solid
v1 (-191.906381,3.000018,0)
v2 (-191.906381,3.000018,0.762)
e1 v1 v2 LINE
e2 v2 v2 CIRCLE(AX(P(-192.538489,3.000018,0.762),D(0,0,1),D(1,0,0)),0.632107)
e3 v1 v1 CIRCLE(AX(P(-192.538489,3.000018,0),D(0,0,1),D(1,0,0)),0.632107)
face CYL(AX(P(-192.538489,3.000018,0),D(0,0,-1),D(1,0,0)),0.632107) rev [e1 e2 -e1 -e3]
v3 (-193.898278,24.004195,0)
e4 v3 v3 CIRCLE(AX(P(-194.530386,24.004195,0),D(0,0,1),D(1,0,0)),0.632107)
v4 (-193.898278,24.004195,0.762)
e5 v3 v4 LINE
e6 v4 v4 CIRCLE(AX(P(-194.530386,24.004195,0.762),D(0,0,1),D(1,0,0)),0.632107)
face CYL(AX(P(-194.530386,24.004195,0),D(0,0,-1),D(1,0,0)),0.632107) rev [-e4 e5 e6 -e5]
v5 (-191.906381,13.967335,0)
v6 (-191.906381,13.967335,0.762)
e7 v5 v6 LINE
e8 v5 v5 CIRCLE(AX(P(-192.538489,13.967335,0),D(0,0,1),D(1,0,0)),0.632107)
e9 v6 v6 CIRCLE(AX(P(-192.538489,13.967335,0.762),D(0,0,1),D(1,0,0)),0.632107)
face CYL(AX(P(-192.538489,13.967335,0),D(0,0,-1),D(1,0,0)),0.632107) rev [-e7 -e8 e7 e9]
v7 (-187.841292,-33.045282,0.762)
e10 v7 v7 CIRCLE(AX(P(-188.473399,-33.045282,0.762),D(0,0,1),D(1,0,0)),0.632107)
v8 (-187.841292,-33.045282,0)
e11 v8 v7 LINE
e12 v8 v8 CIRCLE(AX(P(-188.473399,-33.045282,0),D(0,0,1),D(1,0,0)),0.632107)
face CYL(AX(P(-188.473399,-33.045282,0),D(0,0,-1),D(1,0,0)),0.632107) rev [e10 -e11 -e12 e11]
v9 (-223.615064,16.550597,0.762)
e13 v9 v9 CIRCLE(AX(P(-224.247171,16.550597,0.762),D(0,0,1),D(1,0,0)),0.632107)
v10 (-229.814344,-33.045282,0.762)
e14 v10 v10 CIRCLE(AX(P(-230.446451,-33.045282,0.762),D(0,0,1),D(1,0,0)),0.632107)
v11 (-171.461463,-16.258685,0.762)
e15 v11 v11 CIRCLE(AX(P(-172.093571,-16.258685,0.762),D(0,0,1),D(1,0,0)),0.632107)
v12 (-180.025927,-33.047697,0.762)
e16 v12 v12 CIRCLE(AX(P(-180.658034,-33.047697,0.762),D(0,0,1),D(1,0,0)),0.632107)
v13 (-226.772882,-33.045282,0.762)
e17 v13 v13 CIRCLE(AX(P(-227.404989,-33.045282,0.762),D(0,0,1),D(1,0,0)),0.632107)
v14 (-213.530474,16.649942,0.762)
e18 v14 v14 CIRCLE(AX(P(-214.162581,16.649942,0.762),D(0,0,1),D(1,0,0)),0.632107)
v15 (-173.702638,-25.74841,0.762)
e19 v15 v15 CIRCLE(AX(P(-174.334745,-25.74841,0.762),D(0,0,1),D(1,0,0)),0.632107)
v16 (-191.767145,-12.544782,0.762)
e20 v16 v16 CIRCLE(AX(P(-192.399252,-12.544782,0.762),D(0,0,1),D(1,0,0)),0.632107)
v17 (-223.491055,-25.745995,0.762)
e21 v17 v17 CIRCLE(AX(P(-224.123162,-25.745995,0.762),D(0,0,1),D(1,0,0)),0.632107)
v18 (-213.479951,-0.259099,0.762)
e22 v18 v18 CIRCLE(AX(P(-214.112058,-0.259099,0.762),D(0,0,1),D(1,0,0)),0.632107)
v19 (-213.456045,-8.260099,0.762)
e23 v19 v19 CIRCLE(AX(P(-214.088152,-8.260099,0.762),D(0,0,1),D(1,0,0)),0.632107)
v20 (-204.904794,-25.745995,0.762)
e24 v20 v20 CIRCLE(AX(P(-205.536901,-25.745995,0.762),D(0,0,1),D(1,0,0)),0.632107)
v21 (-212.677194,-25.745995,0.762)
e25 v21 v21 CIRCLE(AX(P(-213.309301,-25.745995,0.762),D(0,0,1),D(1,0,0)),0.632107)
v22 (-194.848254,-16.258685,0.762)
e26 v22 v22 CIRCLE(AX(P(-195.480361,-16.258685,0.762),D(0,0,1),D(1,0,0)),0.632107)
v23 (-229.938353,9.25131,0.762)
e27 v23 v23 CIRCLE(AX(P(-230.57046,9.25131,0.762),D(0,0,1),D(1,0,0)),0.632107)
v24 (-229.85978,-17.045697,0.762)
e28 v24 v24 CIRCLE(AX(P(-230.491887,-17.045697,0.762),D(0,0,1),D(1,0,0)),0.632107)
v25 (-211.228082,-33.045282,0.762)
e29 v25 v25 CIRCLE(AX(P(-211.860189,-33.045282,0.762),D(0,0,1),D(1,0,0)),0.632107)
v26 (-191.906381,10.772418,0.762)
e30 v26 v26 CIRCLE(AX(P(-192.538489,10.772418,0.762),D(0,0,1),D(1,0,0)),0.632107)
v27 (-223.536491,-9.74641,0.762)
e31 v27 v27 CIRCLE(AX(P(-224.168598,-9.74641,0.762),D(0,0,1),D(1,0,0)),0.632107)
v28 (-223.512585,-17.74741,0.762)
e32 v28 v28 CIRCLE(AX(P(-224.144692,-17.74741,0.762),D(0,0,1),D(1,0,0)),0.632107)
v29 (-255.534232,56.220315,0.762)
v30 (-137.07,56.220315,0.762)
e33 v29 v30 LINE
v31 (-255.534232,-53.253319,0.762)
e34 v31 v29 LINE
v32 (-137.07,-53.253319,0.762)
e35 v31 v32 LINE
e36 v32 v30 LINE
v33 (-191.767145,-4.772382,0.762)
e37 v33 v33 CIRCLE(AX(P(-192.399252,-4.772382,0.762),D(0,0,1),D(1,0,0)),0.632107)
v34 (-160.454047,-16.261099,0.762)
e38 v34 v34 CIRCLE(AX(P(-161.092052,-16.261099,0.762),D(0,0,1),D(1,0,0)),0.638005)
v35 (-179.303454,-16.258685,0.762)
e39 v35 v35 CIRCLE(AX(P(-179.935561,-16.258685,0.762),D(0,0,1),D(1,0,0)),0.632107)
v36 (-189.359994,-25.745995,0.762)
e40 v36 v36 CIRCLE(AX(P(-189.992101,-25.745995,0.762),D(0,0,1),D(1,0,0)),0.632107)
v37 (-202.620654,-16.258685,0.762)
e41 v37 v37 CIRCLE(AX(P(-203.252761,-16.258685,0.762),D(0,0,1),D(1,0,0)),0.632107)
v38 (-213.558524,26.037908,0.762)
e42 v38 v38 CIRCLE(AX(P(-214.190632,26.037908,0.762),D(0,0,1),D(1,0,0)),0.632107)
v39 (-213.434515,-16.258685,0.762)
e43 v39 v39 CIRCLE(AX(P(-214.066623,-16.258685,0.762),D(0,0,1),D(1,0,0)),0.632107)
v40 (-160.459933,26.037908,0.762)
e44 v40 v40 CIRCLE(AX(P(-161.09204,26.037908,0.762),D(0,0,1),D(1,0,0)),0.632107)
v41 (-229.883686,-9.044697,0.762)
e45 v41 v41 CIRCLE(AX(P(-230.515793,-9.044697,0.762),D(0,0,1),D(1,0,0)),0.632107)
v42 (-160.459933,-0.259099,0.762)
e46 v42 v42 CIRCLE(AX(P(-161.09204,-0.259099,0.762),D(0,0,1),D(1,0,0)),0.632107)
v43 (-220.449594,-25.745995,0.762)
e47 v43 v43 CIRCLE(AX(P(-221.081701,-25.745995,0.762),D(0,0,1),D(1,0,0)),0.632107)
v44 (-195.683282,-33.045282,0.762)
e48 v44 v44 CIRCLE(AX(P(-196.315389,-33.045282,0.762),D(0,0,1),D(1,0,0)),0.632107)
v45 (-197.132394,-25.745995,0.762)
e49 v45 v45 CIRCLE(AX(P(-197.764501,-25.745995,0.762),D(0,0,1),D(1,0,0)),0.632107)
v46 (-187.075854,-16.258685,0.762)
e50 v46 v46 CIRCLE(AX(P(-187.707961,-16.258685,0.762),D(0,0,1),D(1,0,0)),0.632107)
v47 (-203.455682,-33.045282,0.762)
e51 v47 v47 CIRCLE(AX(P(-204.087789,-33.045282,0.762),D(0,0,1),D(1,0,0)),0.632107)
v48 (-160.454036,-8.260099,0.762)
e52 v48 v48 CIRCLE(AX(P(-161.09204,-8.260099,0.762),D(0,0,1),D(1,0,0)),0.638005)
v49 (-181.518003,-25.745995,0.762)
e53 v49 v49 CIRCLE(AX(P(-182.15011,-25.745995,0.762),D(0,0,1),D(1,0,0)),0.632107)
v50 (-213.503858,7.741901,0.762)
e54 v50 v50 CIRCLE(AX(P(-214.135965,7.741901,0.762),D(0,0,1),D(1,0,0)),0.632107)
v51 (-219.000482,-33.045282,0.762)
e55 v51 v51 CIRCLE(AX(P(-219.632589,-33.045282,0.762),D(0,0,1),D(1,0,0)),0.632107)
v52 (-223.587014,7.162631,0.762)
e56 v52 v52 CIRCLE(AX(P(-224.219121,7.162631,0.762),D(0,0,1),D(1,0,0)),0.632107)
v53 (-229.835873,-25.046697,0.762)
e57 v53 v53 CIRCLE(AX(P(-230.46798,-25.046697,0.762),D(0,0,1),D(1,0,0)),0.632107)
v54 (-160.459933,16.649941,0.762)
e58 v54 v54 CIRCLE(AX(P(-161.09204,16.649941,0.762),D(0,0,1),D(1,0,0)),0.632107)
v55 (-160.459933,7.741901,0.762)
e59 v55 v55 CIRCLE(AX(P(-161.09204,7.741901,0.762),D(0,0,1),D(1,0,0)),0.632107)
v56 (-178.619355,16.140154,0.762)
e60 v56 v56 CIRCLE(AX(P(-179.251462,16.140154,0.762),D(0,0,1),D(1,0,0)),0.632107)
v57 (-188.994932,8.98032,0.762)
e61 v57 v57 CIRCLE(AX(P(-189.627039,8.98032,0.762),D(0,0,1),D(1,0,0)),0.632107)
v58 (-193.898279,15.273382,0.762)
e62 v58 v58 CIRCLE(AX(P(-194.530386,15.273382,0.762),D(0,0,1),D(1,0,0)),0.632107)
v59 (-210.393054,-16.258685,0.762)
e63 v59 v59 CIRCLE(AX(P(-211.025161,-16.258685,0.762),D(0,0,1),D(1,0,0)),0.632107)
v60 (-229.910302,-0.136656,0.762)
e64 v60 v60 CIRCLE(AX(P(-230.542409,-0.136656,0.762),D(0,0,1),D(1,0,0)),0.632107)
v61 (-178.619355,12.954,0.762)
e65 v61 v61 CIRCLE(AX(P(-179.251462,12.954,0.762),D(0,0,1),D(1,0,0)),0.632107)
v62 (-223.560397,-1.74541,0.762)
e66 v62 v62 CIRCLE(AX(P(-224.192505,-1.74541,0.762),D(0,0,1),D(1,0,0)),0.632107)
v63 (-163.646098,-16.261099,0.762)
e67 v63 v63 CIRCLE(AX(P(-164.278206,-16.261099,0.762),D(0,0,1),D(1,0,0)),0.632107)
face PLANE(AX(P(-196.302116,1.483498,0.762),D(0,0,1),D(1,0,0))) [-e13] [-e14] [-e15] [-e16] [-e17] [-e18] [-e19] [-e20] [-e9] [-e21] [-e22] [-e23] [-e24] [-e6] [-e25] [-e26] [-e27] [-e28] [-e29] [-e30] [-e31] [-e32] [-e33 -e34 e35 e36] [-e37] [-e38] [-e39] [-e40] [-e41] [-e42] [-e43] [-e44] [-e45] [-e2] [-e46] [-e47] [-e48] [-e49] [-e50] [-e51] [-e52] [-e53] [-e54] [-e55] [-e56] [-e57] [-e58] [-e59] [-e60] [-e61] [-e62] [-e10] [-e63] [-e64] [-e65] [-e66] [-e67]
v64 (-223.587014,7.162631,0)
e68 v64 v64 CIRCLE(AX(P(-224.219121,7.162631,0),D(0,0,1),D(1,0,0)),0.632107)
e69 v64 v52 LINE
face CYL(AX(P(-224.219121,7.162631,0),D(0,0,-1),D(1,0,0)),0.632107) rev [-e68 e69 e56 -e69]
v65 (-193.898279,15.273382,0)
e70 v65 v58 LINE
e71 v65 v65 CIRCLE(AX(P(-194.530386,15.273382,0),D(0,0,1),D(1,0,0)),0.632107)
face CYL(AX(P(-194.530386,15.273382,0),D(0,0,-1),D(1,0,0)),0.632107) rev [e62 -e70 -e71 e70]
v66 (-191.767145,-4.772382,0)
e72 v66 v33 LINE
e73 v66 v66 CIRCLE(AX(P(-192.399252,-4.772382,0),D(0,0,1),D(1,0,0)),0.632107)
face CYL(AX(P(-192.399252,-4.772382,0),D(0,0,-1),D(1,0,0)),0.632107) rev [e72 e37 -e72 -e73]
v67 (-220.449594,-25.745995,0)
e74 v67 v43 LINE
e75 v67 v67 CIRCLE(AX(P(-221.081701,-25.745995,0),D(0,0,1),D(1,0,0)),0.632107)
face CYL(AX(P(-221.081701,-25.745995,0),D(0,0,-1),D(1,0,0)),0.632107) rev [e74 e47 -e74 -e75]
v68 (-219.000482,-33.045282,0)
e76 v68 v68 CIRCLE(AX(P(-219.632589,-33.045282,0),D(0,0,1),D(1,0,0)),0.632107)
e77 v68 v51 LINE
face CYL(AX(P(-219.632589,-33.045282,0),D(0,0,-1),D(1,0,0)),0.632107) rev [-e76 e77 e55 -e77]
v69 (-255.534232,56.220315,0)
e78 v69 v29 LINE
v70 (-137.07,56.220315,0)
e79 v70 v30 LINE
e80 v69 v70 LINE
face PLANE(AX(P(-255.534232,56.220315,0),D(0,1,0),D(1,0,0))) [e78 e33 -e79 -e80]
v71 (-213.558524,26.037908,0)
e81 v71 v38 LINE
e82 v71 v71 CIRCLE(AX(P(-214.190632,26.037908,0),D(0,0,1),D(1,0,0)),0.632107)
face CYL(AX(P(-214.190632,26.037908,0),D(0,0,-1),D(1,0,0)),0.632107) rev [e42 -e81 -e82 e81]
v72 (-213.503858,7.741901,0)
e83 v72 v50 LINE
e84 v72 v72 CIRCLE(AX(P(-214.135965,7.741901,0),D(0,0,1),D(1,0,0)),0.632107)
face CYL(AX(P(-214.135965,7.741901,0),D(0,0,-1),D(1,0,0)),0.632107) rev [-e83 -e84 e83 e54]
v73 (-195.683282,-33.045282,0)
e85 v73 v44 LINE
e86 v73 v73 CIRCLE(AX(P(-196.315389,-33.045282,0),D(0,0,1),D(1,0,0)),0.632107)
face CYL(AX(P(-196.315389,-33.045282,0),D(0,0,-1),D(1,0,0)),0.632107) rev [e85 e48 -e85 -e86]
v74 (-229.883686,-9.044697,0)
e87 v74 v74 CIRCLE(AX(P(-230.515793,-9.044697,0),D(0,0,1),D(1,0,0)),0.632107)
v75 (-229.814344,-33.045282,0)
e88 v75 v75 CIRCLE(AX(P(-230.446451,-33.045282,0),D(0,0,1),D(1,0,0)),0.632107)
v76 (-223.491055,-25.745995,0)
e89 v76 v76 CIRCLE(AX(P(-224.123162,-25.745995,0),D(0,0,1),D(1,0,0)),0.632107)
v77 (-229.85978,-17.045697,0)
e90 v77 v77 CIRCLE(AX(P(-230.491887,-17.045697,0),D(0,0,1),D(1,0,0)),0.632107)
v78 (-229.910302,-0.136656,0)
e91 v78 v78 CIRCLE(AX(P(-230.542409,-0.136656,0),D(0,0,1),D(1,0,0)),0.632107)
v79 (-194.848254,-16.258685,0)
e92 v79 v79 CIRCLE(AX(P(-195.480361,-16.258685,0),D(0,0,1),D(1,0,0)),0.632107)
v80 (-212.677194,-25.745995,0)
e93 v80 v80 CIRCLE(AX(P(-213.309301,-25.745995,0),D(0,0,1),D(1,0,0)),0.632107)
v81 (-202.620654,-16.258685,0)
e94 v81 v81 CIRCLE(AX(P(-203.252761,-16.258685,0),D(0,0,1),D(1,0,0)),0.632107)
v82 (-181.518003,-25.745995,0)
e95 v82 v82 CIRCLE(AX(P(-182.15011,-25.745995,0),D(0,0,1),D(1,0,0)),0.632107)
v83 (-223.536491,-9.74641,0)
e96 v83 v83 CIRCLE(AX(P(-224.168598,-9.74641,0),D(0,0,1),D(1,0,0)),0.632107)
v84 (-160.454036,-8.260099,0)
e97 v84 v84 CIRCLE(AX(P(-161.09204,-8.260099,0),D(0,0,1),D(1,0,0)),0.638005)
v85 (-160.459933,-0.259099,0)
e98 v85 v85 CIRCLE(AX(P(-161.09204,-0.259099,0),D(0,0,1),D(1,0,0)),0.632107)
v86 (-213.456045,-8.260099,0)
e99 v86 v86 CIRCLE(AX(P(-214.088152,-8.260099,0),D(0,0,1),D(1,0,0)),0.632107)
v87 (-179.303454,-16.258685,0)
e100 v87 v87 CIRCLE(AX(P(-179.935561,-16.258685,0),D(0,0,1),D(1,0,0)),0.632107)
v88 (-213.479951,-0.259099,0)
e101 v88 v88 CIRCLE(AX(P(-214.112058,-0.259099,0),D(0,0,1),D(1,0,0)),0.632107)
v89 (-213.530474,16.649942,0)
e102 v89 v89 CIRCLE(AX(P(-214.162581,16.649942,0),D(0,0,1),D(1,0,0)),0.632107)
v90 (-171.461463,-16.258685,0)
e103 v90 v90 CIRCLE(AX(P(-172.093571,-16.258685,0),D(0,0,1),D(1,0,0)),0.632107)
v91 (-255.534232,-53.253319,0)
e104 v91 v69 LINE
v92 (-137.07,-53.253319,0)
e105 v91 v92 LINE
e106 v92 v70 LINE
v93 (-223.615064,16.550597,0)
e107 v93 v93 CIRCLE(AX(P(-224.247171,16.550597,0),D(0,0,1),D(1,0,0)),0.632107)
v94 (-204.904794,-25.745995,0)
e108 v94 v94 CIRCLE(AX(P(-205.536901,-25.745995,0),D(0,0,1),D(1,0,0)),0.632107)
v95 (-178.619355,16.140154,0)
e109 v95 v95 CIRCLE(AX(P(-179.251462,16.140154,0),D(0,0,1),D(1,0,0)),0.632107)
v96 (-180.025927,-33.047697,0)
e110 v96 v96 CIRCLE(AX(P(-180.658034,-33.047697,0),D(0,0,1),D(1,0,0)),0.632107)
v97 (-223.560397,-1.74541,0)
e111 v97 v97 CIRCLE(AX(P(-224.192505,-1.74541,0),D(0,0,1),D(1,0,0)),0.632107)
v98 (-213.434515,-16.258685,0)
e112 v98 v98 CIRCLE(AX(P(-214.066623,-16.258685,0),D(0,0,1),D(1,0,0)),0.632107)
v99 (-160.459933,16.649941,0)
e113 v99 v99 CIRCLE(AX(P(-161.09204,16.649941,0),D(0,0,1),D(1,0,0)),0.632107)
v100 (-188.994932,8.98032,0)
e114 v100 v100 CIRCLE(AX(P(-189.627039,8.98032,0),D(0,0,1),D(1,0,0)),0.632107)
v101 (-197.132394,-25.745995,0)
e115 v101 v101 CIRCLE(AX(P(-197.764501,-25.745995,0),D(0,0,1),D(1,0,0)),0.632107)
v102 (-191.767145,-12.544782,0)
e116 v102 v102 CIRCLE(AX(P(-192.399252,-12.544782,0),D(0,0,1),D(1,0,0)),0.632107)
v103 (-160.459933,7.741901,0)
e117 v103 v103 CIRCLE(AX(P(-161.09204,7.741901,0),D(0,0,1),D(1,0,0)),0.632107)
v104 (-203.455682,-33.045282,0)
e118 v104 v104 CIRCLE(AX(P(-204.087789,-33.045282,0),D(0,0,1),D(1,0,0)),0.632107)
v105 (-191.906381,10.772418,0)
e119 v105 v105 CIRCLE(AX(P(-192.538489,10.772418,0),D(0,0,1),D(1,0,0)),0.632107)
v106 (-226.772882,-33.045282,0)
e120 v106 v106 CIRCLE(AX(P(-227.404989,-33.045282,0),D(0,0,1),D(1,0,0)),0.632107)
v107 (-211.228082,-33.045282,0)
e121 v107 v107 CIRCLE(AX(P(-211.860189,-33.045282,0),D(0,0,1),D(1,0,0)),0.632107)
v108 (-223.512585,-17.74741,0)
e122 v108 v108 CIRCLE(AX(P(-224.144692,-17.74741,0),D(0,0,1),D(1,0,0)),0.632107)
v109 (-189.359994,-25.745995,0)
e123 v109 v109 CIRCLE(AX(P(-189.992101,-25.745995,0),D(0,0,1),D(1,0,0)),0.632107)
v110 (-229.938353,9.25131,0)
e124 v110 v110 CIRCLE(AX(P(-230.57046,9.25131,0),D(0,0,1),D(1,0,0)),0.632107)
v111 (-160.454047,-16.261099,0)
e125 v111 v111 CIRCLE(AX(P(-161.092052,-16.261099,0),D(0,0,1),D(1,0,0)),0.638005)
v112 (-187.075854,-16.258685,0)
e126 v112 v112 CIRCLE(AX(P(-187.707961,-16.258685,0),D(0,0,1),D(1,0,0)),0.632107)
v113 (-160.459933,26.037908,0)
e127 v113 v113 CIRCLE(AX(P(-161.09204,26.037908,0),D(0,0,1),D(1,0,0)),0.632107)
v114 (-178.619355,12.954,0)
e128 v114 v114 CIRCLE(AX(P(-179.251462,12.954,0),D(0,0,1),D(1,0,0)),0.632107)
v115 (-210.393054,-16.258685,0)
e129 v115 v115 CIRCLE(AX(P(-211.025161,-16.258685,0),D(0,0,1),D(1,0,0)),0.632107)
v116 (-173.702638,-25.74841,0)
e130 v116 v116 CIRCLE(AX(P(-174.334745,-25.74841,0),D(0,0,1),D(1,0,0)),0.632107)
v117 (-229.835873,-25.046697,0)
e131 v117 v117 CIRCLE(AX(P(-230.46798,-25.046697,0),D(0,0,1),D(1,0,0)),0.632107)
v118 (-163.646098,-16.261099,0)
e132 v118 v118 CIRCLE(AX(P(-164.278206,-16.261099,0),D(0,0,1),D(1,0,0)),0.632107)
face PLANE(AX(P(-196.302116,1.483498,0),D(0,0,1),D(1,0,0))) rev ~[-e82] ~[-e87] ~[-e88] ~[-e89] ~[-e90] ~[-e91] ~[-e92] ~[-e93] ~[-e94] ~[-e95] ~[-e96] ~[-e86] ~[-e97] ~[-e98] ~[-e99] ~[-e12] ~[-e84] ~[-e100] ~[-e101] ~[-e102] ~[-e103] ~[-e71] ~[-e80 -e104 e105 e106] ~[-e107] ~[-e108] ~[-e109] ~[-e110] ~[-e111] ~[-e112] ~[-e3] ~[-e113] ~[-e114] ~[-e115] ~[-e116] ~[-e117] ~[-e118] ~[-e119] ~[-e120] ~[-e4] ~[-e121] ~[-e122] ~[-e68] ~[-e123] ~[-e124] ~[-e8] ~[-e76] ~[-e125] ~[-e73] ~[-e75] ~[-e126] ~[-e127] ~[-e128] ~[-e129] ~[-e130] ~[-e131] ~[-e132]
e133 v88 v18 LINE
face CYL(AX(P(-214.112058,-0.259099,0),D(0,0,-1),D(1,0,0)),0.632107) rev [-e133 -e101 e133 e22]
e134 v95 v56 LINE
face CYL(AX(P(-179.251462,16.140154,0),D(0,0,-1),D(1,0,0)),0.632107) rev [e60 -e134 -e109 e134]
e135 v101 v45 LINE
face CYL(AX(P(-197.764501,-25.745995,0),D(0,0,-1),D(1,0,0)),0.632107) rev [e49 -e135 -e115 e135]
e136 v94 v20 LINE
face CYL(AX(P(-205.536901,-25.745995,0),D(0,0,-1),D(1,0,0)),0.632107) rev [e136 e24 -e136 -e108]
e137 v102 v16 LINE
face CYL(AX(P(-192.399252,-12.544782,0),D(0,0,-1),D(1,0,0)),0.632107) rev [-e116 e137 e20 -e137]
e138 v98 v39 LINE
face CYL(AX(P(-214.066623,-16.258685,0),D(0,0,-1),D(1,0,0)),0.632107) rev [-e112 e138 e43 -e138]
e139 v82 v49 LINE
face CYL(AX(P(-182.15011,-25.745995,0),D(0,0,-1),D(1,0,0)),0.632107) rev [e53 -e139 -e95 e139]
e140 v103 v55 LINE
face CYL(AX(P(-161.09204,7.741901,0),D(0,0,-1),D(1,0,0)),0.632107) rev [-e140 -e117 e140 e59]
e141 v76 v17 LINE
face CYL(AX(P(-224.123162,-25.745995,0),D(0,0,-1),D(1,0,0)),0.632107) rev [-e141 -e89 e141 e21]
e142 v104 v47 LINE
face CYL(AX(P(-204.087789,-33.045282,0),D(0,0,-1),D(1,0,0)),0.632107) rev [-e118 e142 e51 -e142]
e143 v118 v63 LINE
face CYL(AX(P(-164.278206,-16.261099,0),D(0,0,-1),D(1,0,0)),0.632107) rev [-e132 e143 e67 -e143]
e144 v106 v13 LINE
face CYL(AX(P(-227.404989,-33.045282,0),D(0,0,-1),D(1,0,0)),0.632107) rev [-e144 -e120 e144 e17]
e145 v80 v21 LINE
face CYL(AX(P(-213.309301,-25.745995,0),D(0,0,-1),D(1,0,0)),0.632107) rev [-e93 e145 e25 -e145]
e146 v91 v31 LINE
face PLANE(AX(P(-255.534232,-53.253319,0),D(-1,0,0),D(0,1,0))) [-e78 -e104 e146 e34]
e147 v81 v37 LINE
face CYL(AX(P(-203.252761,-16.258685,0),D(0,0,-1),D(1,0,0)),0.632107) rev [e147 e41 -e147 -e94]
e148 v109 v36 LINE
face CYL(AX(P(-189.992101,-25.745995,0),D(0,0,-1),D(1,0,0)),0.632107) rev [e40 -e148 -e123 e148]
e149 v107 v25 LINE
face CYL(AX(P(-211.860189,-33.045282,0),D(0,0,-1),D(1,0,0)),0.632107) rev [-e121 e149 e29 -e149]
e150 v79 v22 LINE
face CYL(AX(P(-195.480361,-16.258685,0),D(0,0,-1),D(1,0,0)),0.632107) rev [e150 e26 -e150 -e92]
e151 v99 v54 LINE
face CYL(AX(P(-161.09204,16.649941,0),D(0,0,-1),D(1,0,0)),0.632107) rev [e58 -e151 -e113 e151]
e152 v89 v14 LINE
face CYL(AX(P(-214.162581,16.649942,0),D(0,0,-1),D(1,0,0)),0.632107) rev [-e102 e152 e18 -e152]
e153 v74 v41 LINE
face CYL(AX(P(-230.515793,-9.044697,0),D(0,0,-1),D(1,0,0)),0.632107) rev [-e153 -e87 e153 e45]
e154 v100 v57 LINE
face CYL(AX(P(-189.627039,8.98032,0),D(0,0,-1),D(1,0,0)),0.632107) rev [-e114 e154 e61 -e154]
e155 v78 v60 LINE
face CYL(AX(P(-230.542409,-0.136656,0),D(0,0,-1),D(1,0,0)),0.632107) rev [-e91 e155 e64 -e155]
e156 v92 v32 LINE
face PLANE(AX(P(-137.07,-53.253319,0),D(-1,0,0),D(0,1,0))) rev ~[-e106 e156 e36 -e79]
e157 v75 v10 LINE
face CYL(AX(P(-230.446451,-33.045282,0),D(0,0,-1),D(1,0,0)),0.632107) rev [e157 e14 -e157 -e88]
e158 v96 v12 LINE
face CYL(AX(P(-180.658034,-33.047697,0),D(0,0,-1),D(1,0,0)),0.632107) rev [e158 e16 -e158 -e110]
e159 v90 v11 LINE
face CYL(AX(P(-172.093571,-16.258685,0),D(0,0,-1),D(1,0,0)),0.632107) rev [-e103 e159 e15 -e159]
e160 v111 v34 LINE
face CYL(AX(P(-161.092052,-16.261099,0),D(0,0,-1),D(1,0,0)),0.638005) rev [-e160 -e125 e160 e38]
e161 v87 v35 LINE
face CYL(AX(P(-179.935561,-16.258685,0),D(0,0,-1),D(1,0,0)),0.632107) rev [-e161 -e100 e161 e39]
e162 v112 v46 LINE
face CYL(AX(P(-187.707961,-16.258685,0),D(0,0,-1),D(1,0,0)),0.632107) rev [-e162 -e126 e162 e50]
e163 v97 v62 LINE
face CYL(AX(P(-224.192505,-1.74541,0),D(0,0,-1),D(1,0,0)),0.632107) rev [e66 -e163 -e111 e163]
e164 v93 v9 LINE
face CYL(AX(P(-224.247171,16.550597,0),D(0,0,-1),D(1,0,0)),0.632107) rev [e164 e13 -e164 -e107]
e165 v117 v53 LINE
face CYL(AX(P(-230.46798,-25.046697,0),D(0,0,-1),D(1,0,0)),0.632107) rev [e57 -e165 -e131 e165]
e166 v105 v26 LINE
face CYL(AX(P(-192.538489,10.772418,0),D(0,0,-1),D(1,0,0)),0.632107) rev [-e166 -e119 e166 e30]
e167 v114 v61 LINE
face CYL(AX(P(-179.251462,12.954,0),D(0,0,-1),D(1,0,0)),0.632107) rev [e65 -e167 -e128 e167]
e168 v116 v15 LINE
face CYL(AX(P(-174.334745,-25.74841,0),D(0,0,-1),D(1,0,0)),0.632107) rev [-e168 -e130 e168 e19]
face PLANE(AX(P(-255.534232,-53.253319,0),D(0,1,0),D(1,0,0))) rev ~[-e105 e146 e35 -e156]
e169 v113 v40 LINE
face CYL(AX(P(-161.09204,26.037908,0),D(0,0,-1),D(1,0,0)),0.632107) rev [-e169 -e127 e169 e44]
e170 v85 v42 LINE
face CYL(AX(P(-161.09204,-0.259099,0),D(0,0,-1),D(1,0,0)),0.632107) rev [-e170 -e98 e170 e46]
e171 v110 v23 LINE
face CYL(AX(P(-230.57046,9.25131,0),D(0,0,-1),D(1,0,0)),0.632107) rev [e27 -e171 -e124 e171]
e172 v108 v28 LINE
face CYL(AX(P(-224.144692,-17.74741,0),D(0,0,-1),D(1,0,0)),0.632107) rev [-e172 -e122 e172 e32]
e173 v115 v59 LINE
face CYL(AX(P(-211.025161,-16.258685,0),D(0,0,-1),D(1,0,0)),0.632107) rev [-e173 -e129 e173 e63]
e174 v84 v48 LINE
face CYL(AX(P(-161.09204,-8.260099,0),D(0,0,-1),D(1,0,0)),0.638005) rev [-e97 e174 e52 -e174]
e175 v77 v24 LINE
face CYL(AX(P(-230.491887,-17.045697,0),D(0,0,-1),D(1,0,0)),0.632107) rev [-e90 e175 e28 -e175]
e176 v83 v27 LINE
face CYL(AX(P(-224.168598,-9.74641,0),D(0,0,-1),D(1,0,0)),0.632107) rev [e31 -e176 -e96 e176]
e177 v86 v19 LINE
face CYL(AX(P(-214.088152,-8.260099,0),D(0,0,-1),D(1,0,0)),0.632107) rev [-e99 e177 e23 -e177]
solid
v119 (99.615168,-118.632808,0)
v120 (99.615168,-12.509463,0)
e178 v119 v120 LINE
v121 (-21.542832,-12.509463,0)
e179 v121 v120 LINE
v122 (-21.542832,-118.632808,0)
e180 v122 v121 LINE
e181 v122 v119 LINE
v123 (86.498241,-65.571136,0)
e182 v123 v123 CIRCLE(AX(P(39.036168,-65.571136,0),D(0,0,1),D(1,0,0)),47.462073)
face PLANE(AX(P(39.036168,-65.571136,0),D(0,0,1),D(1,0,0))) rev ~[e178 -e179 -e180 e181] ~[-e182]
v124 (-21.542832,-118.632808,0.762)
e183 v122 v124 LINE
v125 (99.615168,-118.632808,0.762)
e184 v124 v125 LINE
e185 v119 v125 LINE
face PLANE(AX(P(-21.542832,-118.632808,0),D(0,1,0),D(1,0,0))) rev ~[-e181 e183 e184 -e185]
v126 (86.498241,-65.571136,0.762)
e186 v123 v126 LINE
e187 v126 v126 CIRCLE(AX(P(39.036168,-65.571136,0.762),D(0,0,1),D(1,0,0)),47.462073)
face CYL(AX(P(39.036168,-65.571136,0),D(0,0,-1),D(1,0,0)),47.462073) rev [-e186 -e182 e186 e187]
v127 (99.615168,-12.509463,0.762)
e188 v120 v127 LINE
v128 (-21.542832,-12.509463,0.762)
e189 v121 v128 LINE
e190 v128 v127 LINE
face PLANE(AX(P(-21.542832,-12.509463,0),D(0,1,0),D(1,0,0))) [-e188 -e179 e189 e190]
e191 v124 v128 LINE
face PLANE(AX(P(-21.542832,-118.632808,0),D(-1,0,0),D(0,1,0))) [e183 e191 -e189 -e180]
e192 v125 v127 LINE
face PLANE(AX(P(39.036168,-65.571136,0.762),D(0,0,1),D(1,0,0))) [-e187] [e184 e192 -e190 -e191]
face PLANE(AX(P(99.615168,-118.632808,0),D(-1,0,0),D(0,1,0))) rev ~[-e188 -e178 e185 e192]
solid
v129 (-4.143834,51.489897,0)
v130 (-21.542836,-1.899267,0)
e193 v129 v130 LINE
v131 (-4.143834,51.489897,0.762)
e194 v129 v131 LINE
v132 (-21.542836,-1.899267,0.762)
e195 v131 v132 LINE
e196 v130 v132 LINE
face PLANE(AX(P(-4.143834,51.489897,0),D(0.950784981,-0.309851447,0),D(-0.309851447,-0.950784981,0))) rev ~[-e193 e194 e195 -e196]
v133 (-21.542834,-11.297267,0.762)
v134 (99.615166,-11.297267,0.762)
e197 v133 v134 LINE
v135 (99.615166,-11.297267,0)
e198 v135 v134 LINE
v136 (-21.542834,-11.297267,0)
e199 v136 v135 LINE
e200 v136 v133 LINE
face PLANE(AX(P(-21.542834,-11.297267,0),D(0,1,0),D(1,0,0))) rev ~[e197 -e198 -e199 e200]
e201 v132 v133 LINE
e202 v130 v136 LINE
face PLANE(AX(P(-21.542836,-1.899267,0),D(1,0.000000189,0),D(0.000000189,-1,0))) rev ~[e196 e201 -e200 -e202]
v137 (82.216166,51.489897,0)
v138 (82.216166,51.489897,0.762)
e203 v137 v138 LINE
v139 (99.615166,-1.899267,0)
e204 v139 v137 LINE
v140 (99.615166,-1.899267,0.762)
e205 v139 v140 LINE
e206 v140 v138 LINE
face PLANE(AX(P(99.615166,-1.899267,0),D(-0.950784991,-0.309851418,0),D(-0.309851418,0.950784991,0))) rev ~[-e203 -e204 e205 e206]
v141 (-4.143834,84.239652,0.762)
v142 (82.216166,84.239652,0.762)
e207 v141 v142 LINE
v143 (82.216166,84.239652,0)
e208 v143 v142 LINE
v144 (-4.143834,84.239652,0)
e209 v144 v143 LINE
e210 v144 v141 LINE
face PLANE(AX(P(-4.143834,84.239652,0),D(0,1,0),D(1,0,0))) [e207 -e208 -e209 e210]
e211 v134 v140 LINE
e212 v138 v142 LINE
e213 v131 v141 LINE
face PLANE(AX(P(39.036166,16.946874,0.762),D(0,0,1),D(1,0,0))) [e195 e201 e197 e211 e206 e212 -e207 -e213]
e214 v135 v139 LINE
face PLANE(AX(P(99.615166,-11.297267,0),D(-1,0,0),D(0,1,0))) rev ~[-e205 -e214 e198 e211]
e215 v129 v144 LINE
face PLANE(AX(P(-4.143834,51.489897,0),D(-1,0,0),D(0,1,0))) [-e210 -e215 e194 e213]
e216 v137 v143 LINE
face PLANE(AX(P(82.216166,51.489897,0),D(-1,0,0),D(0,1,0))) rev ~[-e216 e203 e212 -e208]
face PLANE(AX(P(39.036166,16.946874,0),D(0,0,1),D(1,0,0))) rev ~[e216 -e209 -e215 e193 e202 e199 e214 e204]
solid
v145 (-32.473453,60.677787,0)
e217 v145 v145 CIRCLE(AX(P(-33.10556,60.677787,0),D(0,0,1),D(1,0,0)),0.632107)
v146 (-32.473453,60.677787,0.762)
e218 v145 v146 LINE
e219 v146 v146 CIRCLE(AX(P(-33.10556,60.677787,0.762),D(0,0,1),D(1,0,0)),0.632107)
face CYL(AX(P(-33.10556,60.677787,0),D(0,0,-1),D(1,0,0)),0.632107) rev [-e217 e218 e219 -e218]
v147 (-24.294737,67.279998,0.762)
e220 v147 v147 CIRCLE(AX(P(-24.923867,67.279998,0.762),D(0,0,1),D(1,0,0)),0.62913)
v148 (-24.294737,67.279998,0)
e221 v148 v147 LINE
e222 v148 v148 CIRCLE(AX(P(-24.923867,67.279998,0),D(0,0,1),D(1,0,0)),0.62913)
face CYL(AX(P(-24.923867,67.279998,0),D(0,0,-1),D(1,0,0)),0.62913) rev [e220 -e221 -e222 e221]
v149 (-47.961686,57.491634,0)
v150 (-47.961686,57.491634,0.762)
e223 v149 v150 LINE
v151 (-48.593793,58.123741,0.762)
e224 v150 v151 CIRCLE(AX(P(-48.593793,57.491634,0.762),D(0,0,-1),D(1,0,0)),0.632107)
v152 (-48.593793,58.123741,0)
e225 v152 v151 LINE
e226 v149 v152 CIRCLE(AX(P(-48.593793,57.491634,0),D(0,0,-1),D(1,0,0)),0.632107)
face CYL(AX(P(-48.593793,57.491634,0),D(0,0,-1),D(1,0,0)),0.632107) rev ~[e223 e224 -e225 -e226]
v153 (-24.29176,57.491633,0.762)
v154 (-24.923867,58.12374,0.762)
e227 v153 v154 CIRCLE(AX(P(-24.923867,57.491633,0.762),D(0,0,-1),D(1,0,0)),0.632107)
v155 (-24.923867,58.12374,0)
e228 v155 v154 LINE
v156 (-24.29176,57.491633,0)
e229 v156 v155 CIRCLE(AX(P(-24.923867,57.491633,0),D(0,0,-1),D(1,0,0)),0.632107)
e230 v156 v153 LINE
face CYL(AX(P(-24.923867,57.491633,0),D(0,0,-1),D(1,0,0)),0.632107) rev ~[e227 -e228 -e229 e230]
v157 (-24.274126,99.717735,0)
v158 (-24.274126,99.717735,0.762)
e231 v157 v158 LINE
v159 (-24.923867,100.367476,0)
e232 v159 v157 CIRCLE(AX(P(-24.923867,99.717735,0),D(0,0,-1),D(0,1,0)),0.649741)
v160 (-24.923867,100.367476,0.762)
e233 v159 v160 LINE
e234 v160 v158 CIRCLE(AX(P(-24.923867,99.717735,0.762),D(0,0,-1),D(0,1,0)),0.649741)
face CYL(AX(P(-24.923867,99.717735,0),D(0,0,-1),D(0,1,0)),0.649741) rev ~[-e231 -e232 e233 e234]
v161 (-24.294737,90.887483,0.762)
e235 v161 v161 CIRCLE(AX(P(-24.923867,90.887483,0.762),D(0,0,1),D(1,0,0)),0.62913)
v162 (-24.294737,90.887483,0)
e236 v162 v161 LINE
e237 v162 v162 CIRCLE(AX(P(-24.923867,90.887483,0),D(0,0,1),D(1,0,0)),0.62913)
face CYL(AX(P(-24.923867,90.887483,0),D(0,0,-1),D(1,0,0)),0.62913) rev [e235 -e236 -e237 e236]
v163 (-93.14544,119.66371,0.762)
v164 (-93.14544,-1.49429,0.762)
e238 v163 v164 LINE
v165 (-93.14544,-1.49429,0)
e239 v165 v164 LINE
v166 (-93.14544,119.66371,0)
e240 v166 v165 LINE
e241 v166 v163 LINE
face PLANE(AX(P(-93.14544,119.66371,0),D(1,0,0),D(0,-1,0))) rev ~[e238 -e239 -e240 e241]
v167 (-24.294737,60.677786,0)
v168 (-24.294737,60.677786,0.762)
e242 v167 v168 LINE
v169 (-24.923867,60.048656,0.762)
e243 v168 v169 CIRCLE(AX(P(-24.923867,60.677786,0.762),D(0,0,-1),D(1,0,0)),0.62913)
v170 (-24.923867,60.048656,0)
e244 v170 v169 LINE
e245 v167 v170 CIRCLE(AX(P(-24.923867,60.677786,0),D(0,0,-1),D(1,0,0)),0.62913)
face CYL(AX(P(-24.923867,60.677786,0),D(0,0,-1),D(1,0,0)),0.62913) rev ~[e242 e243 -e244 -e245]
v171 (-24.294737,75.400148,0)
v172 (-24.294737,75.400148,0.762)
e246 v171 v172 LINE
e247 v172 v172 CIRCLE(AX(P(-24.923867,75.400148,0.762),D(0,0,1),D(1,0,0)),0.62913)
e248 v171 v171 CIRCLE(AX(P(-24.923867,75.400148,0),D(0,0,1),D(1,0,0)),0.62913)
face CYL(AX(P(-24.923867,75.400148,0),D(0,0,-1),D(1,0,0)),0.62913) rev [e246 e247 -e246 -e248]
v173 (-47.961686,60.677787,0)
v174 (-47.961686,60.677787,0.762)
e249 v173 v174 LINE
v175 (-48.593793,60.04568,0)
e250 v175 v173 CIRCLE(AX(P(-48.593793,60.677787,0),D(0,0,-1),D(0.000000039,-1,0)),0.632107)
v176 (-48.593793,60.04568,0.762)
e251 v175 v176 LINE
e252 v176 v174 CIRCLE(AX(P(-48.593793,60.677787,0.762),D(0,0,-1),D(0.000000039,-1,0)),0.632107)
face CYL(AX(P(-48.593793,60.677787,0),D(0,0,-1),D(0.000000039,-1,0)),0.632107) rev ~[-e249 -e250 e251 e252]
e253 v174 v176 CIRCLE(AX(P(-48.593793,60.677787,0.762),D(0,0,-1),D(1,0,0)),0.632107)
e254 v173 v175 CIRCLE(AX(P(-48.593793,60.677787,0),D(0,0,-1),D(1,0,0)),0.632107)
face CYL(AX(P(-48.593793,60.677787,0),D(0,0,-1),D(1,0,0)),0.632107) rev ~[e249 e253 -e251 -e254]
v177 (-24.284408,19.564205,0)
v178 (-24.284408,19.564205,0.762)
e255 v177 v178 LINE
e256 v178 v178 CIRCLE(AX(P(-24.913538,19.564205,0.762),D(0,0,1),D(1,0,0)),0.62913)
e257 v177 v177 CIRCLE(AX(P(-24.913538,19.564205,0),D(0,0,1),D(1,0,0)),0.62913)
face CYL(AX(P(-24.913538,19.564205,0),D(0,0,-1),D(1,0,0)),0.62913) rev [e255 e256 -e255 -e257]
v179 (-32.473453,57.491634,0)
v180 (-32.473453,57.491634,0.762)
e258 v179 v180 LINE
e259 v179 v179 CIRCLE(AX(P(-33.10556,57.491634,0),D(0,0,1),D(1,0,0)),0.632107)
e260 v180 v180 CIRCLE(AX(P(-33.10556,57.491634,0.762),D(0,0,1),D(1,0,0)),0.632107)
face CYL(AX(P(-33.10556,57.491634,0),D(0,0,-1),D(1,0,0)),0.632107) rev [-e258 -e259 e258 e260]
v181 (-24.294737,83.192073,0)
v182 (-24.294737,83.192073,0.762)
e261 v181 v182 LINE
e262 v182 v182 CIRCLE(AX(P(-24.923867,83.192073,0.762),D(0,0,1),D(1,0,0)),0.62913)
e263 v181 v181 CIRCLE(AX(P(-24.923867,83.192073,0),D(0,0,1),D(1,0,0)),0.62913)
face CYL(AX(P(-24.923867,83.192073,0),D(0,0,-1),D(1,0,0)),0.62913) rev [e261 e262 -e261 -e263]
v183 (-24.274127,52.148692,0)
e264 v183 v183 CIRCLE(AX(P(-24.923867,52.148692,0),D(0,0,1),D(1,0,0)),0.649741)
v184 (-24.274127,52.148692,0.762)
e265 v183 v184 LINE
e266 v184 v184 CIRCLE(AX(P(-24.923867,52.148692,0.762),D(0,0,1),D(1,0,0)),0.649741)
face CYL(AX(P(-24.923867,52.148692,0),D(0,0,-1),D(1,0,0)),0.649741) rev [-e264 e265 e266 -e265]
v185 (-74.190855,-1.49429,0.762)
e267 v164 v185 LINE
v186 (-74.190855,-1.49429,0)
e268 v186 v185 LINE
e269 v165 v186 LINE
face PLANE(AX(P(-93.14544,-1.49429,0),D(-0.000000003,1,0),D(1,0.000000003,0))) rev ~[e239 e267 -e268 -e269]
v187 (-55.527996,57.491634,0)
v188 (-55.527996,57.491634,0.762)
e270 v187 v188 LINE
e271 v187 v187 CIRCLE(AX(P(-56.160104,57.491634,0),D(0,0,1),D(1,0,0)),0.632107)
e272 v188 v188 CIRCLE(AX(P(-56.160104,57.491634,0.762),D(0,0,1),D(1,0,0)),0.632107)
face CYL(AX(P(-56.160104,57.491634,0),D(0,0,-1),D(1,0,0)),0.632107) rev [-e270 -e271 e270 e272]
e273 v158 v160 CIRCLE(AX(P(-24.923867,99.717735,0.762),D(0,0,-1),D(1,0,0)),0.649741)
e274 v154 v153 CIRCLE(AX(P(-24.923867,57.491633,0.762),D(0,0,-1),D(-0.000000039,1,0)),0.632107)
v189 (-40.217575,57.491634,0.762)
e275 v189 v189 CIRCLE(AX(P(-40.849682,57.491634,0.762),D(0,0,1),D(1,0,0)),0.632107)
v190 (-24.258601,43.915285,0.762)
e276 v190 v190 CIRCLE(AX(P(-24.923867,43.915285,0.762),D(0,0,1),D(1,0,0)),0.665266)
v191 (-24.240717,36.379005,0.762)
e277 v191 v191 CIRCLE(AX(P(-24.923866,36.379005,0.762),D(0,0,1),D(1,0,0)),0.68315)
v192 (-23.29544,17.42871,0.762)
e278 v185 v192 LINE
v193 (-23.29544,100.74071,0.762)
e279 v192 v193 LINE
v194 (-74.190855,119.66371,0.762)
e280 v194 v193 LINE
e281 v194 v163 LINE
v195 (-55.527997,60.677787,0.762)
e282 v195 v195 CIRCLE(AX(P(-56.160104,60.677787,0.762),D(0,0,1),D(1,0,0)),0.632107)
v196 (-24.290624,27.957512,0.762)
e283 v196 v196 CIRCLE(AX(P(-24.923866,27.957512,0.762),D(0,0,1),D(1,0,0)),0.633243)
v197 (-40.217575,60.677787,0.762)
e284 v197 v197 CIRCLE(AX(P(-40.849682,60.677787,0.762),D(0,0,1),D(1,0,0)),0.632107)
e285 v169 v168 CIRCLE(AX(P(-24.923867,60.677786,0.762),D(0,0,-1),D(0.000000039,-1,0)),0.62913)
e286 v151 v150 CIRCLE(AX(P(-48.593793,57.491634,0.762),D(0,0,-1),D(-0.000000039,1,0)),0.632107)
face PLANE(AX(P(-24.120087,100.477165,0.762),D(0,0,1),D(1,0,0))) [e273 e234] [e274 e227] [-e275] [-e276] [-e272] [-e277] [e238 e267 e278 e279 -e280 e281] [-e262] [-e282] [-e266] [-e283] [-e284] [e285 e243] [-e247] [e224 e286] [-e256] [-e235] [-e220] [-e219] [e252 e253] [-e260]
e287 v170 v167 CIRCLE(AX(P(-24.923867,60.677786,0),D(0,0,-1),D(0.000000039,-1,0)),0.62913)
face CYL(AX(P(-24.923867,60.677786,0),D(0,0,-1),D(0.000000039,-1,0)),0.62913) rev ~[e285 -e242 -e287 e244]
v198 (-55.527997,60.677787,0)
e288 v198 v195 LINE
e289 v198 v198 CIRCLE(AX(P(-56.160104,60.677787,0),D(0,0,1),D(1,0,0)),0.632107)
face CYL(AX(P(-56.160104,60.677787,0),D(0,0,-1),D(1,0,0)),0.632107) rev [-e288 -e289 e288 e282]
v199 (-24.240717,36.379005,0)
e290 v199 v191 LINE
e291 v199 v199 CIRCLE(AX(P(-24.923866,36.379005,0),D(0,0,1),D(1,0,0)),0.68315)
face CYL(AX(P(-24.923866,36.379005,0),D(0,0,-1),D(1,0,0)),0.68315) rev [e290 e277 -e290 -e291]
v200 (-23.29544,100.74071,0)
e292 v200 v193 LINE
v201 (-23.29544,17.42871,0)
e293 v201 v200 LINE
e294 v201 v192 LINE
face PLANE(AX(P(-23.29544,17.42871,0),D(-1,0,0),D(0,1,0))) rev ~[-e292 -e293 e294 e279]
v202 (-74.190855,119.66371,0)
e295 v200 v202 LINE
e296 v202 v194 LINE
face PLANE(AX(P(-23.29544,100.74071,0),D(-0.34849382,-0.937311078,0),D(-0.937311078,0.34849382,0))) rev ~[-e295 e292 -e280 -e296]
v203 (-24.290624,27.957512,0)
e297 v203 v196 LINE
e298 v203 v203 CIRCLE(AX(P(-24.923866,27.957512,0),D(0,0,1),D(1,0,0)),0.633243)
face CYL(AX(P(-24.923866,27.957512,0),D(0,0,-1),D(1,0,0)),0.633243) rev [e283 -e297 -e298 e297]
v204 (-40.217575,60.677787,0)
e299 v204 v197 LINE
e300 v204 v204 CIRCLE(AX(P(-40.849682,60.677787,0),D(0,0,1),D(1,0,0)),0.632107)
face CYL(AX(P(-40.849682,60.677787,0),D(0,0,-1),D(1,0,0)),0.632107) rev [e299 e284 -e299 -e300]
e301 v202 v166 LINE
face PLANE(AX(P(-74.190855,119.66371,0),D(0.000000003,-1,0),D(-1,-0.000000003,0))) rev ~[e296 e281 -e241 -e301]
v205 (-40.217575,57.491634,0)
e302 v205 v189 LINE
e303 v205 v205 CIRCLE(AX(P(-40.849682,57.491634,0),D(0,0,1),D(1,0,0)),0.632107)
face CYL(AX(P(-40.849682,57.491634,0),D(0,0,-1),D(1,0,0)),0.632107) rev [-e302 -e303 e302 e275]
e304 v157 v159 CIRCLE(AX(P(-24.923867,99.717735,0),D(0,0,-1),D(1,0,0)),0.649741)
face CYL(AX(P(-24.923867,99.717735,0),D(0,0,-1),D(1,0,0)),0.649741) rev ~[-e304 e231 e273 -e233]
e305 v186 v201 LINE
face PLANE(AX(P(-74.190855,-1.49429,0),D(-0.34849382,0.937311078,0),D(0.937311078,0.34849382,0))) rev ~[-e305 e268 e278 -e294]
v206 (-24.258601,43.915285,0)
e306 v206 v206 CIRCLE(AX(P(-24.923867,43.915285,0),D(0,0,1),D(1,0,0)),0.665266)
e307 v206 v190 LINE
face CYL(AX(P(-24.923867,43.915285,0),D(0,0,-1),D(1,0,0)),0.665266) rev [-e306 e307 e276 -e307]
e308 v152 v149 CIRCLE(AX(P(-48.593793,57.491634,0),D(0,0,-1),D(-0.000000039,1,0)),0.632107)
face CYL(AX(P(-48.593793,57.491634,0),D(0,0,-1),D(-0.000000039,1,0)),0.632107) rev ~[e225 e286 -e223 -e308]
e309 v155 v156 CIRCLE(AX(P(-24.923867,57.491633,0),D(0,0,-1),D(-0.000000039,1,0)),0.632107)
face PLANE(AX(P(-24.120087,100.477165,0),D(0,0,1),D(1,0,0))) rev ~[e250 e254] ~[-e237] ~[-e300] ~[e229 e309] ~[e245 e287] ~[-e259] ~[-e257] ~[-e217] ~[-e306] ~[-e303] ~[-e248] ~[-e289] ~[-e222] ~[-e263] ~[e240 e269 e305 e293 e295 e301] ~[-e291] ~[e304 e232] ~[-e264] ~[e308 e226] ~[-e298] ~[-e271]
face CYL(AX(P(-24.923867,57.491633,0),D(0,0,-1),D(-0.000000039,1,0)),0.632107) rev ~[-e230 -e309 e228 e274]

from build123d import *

# Parameters (mm, degrees)
F0_R     = 0.6291300435
F0_R_2   = 0.6332426452
F0_R_3   = 0.6321071221
F0_R_4   = 0.6831497721
F0_R_5   = 0.6652658208
F0_R_6   = 0.6497405611
F1_DEPTH = 0.762
F0_W     = 121.1580000409
F0_H     = 106.1233448563
F0_R_7   = 47.4620730635
F0_W_2   = 86.36
F0_H_2   = 32.7497554244
F0_W_3   = 118.4642314911
F0_H_3   = 109.4736345112
F0_R_8   = 0.6380048555


# Not quite as in the source:
# - ends of sketch curves that miss each other by under 0.0002 mm in the source are joined


with BuildPart() as f1:
    # F0 (on Top) → F1 (new body)
    with BuildSketch(Plane.XY):
        with BuildLine():
            Line((-23.2954401877, 99.7177349776), (-23.2954401877, 100.7407097936))
            Line((-23.2954401877, 100.7407097936), (-24.9238666147, 101.3461614512))
            Line((-24.9238666147, 101.3461614512), (-24.9238666147, 100.3674755386))
            ThreePointArc((-24.9238666147, 100.3674755386), (-24.464430658, 100.1771709343), (-24.2741260536, 99.7177349776))
            Line((-24.2741260536, 99.7177349776), (-23.295440141, 99.7177349776))
        make_face()
        with BuildLine():
            Line((-23.2954401877, 17.4287097936), (-23.2954401877, 99.7177349776))
            Line((-23.295440141, 99.7177349776), (-24.2741260536, 99.7177349776))
            ThreePointArc((-24.2741260536, 99.7177349776), (-25.3833025714, 99.2582990208), (-24.9238666147, 100.3674755386))
            Line((-24.9238666147, 100.3674755386), (-24.9238666147, 101.3461614512))
            Line((-24.9238666147, 101.3461614512), (-61.3954401877, 114.9063532467))
            Line((-61.3954401877, 114.9063532467), (-61.3954401877, 3.2630663405))
            Line((-61.3954401877, 3.2630663405), (-23.2954401877, 17.4287097936))
        make_face()
        with Locations((-24.9135376631, 19.5642051806)):
            Circle(F0_R, mode=Mode.SUBTRACT)
        with Locations((-24.9238663907, 27.9575124074)):
            Circle(F0_R_2, mode=Mode.SUBTRACT)
        with Locations((-56.1601035297, 57.4916340411)):
            Circle(F0_R_3, mode=Mode.SUBTRACT)
        with BuildLine():
            ThreePointArc((-48.5937930891, 58.1237411632), (-48.1468258406, 57.9386012823), (-47.9616859422, 57.4916340411))
            ThreePointArc((-47.9616859422, 57.4916340411), (-49.0407602881, 57.0446667999), (-48.5937930891, 58.1237411632))
        make_face(mode=Mode.SUBTRACT)
        with Locations((-40.8496819437, 57.4916340411)):
            Circle(F0_R_3, mode=Mode.SUBTRACT)
        with Locations((-24.9238663907, 36.3790051806)):
            Circle(F0_R_4, mode=Mode.SUBTRACT)
        with Locations((-24.9238672481, 43.9152853082)):
            Circle(F0_R_5, mode=Mode.SUBTRACT)
        with Locations((-24.9238672481, 52.148692377)):
            Circle(F0_R_6, mode=Mode.SUBTRACT)
        with Locations((-33.105560055, 57.4916340411)):
            Circle(F0_R_3, mode=Mode.SUBTRACT)
        with BuildLine():
            ThreePointArc((-24.2917600637, 57.49163313), (-25.3708344096, 57.0446658888), (-24.9238672105, 58.1237402522))
            ThreePointArc((-24.9238672105, 58.1237402522), (-24.4768999621, 57.9386003713), (-24.2917600637, 57.49163313))
        make_face(mode=Mode.SUBTRACT)
        with Locations((-56.1601036542, 60.6777873683)):
            Circle(F0_R_3, mode=Mode.SUBTRACT)
        with BuildLine():
            ThreePointArc((-47.9616860667, 60.6777873683), (-48.1468259476, 60.2308201445), (-48.5937931642, 60.0456802461))
            ThreePointArc((-48.5937931642, 60.0456802461), (-49.0407604301, 61.124754592), (-47.9616860667, 60.6777873683))
        make_face(mode=Mode.SUBTRACT)
        with Locations((-40.8496820682, 60.6777873683)):
            Circle(F0_R_3, mode=Mode.SUBTRACT)
        with Locations((-33.1055601795, 60.6777873683)):
            Circle(F0_R_3, mode=Mode.SUBTRACT)
        with BuildLine():
            ThreePointArc((-24.9238672857, 60.0486564137), (-25.368729439, 61.1226485686), (-24.2947372668, 60.6777864572))
            ThreePointArc((-24.2947372668, 60.6777864572), (-24.4790051816, 60.2329243459), (-24.9238672857, 60.0486564137))
        make_face(mode=Mode.SUBTRACT)
        with Locations((-24.9238672481, 67.2799982802)):
            Circle(F0_R, mode=Mode.SUBTRACT)
        with Locations((-24.9238672481, 75.4001476542)):
            Circle(F0_R, mode=Mode.SUBTRACT)
        with Locations((-24.9238672481, 83.1920728759)):
            Circle(F0_R, mode=Mode.SUBTRACT)
        with Locations((-24.9238672481, 90.8874832765)):
            Circle(F0_R, mode=Mode.SUBTRACT)
        Polygon((-61.3954401877, 3.2630663405), (-61.3954401877, 114.9063532467), (-74.1908550262, 119.6637097936), (-93.1454401877, 119.6637097337), (-93.1454401877, -1.4942902663), (-74.1908550262, -1.4942902064), align=None)
    extrude(amount=F1_DEPTH)


with BuildPart() as f1b:
    # F0 (on Top) → F1, piece 2 (new body)
    with BuildSketch(Plane.XY):
        with Locations((39.0361677242, -65.5711358995)):
            Rectangle(F0_W, F0_H)
        with Locations((39.0361677242, -65.5711358995)):
            Circle(F0_R_7, mode=Mode.SUBTRACT)
    extrude(amount=F1_DEPTH)


with BuildPart() as f1c:
    # F0 (on Top) → F1, piece 3 (new body)
    with BuildSketch(Plane.XY):
        Polygon((-21.5428358989, -1.8992669303), (-21.542834118, -11.2972669303), (99.615165882, -11.2972669303), (99.615165882, -1.8992669303), (82.216165882, 51.4898966411), (-4.143834118, 51.4898966411), align=None)
        with Locations((39.036165882, 67.8647743533)):
            Rectangle(F0_W_2, F0_H_2)
    extrude(amount=F1_DEPTH)


with BuildPart() as f1d:
    # F0 (on Top) → F1, piece 4 (new body)
    with BuildSketch(Plane.XY):
        with Locations((-196.3021159172, 1.4834981412)):
            Rectangle(F0_W_3, F0_H_3)
        with Locations((-230.4464508814, -33.0452823357)):
            Circle(F0_R_3, mode=Mode.SUBTRACT)
        with Locations((-227.4049893772, -33.0452823357)):
            Circle(F0_R_3, mode=Mode.SUBTRACT)
        with Locations((-219.6325893772, -33.0452823357)):
            Circle(F0_R_3, mode=Mode.SUBTRACT)
        with Locations((-211.8601893772, -33.0452823357)):
            Circle(F0_R_3, mode=Mode.SUBTRACT)
        with Locations((-204.0877893772, -33.0452823357)):
            Circle(F0_R_3, mode=Mode.SUBTRACT)
        with Locations((-196.3153893772, -33.0452823357)):
            Circle(F0_R_3, mode=Mode.SUBTRACT)
        with Locations((-188.4733988456, -33.0452823357)):
            Circle(F0_R_3, mode=Mode.SUBTRACT)
        with Locations((-180.6580338506, -33.0476967251)):
            Circle(F0_R_3, mode=Mode.SUBTRACT)
        with Locations((-224.1231624798, -25.7459953427)):
            Circle(F0_R_3, mode=Mode.SUBTRACT)
        with Locations((-230.4679803544, -25.0466966536)):
            Circle(F0_R_3, mode=Mode.SUBTRACT)
        with Locations((-221.0817009756, -25.7459953427)):
            Circle(F0_R_3, mode=Mode.SUBTRACT)
        with Locations((-213.3093009756, -25.7459953427)):
            Circle(F0_R_3, mode=Mode.SUBTRACT)
        with Locations((-230.4918866598, -17.0456967317)):
            Circle(F0_R_3, mode=Mode.SUBTRACT)
        with Locations((-224.1446919528, -17.7474096606)):
            Circle(F0_R_3, mode=Mode.SUBTRACT)
        with Locations((-214.0666225876, -16.2586848782)):
            Circle(F0_R_3, mode=Mode.SUBTRACT)
        with Locations((-230.5157929659, -9.0446965769)):
            Circle(F0_R_3, mode=Mode.SUBTRACT)
        with Locations((-224.1685982582, -9.7464097387)):
            Circle(F0_R_3, mode=Mode.SUBTRACT)
        with Locations((-214.0881520606, -8.2600991961)):
            Circle(F0_R_3, mode=Mode.SUBTRACT)
        with Locations((-230.5424094321, -0.1366557553)):
            Circle(F0_R_3, mode=Mode.SUBTRACT)
        with Locations((-224.1925045643, -1.7454095839)):
            Circle(F0_R_3, mode=Mode.SUBTRACT)
        with Locations((-214.112058366, -0.2590992742)):
            Circle(F0_R_3, mode=Mode.SUBTRACT)
        with Locations((-205.5369009756, -25.7459953427)):
            Circle(F0_R_3, mode=Mode.SUBTRACT)
        with Locations((-197.7645009756, -25.7459953427)):
            Circle(F0_R_3, mode=Mode.SUBTRACT)
        with Locations((-189.9921009756, -25.7459953427)):
            Circle(F0_R_3, mode=Mode.SUBTRACT)
        with Locations((-211.0251610834, -16.2586848782)):
            Circle(F0_R_3, mode=Mode.SUBTRACT)
        with Locations((-203.2527610834, -16.2586848782)):
            Circle(F0_R_3, mode=Mode.SUBTRACT)
        with Locations((-195.4803610834, -16.2586848782)):
            Circle(F0_R_3, mode=Mode.SUBTRACT)
        with Locations((-182.150110444, -25.7459953427)):
            Circle(F0_R_3, mode=Mode.SUBTRACT)
        with Locations((-174.334745449, -25.7484097322)):
            Circle(F0_R_3, mode=Mode.SUBTRACT)
        with Locations((-187.7079610834, -16.2586848782)):
            Circle(F0_R_3, mode=Mode.SUBTRACT)
        with Locations((-179.9355610834, -16.2586848782)):
            Circle(F0_R_3, mode=Mode.SUBTRACT)
        with Locations((-172.0935705518, -16.2586848782)):
            Circle(F0_R_3, mode=Mode.SUBTRACT)
        with Locations((-192.3992521438, -12.5447819406)):
            Circle(F0_R_3, mode=Mode.SUBTRACT)
        with Locations((-192.3992521438, -4.7723819406)):
            Circle(F0_R_3, mode=Mode.SUBTRACT)
        with Locations((-164.2782055568, -16.2610992677)):
            Circle(F0_R_3, mode=Mode.SUBTRACT)
        with Locations((-161.0920522296, -16.2610992677)):
            Circle(F0_R_8, mode=Mode.SUBTRACT)
        with Locations((-161.0920404233, -8.2600992677)):
            Circle(F0_R_8, mode=Mode.SUBTRACT)
        with Locations((-161.0920404233, -0.2590992677)):
            Circle(F0_R_3, mode=Mode.SUBTRACT)
        with Locations((-224.2191210306, 7.1626312376)):
            Circle(F0_R_3, mode=Mode.SUBTRACT)
        with Locations((-214.1359646721, 7.7419008806)):
            Circle(F0_R_3, mode=Mode.SUBTRACT)
        with Locations((-230.5704598746, 9.2513104901)):
            Circle(F0_R_3, mode=Mode.SUBTRACT)
        with Locations((-224.2471714731, 16.550597483)):
            Circle(F0_R_3, mode=Mode.SUBTRACT)
        with Locations((-214.1625811384, 16.6499417021)):
            Circle(F0_R_3, mode=Mode.SUBTRACT)
        with Locations((-214.1906315809, 26.0379079475)):
            Circle(F0_R_3, mode=Mode.SUBTRACT)
        with Locations((-192.538488594, 3.0000180594)):
            Circle(F0_R_3, mode=Mode.SUBTRACT)
        with Locations((-189.6270393959, 8.9803204777)):
            Circle(F0_R_3, mode=Mode.SUBTRACT)
        with Locations((-192.538488594, 10.7724180594)):
            Circle(F0_R_3, mode=Mode.SUBTRACT)
        with Locations((-194.5303856338, 15.2733816274)):
            Circle(F0_R_3, mode=Mode.SUBTRACT)
        with Locations((-192.538488594, 13.9673350528)):
            Circle(F0_R_3, mode=Mode.SUBTRACT)
        with Locations((-179.2514622211, 12.9540003836)):
            Circle(F0_R_3, mode=Mode.SUBTRACT)
        with Locations((-194.5303855871, 24.0041953553)):
            Circle(F0_R_3, mode=Mode.SUBTRACT)
        with Locations((-179.2514623457, 16.1401537108)):
            Circle(F0_R_3, mode=Mode.SUBTRACT)
        with Locations((-161.0920404233, 7.7419007323)):
            Circle(F0_R_3, mode=Mode.SUBTRACT)
        with Locations((-161.0920404233, 16.6499411538)):
            Circle(F0_R_3, mode=Mode.SUBTRACT)
        with Locations((-161.0920404233, 26.0379075528)):
            Circle(F0_R_3, mode=Mode.SUBTRACT)
    extrude(amount=F1_DEPTH)


solid = Compound([f1.part, f1b.part, f1c.part, f1d.part])
